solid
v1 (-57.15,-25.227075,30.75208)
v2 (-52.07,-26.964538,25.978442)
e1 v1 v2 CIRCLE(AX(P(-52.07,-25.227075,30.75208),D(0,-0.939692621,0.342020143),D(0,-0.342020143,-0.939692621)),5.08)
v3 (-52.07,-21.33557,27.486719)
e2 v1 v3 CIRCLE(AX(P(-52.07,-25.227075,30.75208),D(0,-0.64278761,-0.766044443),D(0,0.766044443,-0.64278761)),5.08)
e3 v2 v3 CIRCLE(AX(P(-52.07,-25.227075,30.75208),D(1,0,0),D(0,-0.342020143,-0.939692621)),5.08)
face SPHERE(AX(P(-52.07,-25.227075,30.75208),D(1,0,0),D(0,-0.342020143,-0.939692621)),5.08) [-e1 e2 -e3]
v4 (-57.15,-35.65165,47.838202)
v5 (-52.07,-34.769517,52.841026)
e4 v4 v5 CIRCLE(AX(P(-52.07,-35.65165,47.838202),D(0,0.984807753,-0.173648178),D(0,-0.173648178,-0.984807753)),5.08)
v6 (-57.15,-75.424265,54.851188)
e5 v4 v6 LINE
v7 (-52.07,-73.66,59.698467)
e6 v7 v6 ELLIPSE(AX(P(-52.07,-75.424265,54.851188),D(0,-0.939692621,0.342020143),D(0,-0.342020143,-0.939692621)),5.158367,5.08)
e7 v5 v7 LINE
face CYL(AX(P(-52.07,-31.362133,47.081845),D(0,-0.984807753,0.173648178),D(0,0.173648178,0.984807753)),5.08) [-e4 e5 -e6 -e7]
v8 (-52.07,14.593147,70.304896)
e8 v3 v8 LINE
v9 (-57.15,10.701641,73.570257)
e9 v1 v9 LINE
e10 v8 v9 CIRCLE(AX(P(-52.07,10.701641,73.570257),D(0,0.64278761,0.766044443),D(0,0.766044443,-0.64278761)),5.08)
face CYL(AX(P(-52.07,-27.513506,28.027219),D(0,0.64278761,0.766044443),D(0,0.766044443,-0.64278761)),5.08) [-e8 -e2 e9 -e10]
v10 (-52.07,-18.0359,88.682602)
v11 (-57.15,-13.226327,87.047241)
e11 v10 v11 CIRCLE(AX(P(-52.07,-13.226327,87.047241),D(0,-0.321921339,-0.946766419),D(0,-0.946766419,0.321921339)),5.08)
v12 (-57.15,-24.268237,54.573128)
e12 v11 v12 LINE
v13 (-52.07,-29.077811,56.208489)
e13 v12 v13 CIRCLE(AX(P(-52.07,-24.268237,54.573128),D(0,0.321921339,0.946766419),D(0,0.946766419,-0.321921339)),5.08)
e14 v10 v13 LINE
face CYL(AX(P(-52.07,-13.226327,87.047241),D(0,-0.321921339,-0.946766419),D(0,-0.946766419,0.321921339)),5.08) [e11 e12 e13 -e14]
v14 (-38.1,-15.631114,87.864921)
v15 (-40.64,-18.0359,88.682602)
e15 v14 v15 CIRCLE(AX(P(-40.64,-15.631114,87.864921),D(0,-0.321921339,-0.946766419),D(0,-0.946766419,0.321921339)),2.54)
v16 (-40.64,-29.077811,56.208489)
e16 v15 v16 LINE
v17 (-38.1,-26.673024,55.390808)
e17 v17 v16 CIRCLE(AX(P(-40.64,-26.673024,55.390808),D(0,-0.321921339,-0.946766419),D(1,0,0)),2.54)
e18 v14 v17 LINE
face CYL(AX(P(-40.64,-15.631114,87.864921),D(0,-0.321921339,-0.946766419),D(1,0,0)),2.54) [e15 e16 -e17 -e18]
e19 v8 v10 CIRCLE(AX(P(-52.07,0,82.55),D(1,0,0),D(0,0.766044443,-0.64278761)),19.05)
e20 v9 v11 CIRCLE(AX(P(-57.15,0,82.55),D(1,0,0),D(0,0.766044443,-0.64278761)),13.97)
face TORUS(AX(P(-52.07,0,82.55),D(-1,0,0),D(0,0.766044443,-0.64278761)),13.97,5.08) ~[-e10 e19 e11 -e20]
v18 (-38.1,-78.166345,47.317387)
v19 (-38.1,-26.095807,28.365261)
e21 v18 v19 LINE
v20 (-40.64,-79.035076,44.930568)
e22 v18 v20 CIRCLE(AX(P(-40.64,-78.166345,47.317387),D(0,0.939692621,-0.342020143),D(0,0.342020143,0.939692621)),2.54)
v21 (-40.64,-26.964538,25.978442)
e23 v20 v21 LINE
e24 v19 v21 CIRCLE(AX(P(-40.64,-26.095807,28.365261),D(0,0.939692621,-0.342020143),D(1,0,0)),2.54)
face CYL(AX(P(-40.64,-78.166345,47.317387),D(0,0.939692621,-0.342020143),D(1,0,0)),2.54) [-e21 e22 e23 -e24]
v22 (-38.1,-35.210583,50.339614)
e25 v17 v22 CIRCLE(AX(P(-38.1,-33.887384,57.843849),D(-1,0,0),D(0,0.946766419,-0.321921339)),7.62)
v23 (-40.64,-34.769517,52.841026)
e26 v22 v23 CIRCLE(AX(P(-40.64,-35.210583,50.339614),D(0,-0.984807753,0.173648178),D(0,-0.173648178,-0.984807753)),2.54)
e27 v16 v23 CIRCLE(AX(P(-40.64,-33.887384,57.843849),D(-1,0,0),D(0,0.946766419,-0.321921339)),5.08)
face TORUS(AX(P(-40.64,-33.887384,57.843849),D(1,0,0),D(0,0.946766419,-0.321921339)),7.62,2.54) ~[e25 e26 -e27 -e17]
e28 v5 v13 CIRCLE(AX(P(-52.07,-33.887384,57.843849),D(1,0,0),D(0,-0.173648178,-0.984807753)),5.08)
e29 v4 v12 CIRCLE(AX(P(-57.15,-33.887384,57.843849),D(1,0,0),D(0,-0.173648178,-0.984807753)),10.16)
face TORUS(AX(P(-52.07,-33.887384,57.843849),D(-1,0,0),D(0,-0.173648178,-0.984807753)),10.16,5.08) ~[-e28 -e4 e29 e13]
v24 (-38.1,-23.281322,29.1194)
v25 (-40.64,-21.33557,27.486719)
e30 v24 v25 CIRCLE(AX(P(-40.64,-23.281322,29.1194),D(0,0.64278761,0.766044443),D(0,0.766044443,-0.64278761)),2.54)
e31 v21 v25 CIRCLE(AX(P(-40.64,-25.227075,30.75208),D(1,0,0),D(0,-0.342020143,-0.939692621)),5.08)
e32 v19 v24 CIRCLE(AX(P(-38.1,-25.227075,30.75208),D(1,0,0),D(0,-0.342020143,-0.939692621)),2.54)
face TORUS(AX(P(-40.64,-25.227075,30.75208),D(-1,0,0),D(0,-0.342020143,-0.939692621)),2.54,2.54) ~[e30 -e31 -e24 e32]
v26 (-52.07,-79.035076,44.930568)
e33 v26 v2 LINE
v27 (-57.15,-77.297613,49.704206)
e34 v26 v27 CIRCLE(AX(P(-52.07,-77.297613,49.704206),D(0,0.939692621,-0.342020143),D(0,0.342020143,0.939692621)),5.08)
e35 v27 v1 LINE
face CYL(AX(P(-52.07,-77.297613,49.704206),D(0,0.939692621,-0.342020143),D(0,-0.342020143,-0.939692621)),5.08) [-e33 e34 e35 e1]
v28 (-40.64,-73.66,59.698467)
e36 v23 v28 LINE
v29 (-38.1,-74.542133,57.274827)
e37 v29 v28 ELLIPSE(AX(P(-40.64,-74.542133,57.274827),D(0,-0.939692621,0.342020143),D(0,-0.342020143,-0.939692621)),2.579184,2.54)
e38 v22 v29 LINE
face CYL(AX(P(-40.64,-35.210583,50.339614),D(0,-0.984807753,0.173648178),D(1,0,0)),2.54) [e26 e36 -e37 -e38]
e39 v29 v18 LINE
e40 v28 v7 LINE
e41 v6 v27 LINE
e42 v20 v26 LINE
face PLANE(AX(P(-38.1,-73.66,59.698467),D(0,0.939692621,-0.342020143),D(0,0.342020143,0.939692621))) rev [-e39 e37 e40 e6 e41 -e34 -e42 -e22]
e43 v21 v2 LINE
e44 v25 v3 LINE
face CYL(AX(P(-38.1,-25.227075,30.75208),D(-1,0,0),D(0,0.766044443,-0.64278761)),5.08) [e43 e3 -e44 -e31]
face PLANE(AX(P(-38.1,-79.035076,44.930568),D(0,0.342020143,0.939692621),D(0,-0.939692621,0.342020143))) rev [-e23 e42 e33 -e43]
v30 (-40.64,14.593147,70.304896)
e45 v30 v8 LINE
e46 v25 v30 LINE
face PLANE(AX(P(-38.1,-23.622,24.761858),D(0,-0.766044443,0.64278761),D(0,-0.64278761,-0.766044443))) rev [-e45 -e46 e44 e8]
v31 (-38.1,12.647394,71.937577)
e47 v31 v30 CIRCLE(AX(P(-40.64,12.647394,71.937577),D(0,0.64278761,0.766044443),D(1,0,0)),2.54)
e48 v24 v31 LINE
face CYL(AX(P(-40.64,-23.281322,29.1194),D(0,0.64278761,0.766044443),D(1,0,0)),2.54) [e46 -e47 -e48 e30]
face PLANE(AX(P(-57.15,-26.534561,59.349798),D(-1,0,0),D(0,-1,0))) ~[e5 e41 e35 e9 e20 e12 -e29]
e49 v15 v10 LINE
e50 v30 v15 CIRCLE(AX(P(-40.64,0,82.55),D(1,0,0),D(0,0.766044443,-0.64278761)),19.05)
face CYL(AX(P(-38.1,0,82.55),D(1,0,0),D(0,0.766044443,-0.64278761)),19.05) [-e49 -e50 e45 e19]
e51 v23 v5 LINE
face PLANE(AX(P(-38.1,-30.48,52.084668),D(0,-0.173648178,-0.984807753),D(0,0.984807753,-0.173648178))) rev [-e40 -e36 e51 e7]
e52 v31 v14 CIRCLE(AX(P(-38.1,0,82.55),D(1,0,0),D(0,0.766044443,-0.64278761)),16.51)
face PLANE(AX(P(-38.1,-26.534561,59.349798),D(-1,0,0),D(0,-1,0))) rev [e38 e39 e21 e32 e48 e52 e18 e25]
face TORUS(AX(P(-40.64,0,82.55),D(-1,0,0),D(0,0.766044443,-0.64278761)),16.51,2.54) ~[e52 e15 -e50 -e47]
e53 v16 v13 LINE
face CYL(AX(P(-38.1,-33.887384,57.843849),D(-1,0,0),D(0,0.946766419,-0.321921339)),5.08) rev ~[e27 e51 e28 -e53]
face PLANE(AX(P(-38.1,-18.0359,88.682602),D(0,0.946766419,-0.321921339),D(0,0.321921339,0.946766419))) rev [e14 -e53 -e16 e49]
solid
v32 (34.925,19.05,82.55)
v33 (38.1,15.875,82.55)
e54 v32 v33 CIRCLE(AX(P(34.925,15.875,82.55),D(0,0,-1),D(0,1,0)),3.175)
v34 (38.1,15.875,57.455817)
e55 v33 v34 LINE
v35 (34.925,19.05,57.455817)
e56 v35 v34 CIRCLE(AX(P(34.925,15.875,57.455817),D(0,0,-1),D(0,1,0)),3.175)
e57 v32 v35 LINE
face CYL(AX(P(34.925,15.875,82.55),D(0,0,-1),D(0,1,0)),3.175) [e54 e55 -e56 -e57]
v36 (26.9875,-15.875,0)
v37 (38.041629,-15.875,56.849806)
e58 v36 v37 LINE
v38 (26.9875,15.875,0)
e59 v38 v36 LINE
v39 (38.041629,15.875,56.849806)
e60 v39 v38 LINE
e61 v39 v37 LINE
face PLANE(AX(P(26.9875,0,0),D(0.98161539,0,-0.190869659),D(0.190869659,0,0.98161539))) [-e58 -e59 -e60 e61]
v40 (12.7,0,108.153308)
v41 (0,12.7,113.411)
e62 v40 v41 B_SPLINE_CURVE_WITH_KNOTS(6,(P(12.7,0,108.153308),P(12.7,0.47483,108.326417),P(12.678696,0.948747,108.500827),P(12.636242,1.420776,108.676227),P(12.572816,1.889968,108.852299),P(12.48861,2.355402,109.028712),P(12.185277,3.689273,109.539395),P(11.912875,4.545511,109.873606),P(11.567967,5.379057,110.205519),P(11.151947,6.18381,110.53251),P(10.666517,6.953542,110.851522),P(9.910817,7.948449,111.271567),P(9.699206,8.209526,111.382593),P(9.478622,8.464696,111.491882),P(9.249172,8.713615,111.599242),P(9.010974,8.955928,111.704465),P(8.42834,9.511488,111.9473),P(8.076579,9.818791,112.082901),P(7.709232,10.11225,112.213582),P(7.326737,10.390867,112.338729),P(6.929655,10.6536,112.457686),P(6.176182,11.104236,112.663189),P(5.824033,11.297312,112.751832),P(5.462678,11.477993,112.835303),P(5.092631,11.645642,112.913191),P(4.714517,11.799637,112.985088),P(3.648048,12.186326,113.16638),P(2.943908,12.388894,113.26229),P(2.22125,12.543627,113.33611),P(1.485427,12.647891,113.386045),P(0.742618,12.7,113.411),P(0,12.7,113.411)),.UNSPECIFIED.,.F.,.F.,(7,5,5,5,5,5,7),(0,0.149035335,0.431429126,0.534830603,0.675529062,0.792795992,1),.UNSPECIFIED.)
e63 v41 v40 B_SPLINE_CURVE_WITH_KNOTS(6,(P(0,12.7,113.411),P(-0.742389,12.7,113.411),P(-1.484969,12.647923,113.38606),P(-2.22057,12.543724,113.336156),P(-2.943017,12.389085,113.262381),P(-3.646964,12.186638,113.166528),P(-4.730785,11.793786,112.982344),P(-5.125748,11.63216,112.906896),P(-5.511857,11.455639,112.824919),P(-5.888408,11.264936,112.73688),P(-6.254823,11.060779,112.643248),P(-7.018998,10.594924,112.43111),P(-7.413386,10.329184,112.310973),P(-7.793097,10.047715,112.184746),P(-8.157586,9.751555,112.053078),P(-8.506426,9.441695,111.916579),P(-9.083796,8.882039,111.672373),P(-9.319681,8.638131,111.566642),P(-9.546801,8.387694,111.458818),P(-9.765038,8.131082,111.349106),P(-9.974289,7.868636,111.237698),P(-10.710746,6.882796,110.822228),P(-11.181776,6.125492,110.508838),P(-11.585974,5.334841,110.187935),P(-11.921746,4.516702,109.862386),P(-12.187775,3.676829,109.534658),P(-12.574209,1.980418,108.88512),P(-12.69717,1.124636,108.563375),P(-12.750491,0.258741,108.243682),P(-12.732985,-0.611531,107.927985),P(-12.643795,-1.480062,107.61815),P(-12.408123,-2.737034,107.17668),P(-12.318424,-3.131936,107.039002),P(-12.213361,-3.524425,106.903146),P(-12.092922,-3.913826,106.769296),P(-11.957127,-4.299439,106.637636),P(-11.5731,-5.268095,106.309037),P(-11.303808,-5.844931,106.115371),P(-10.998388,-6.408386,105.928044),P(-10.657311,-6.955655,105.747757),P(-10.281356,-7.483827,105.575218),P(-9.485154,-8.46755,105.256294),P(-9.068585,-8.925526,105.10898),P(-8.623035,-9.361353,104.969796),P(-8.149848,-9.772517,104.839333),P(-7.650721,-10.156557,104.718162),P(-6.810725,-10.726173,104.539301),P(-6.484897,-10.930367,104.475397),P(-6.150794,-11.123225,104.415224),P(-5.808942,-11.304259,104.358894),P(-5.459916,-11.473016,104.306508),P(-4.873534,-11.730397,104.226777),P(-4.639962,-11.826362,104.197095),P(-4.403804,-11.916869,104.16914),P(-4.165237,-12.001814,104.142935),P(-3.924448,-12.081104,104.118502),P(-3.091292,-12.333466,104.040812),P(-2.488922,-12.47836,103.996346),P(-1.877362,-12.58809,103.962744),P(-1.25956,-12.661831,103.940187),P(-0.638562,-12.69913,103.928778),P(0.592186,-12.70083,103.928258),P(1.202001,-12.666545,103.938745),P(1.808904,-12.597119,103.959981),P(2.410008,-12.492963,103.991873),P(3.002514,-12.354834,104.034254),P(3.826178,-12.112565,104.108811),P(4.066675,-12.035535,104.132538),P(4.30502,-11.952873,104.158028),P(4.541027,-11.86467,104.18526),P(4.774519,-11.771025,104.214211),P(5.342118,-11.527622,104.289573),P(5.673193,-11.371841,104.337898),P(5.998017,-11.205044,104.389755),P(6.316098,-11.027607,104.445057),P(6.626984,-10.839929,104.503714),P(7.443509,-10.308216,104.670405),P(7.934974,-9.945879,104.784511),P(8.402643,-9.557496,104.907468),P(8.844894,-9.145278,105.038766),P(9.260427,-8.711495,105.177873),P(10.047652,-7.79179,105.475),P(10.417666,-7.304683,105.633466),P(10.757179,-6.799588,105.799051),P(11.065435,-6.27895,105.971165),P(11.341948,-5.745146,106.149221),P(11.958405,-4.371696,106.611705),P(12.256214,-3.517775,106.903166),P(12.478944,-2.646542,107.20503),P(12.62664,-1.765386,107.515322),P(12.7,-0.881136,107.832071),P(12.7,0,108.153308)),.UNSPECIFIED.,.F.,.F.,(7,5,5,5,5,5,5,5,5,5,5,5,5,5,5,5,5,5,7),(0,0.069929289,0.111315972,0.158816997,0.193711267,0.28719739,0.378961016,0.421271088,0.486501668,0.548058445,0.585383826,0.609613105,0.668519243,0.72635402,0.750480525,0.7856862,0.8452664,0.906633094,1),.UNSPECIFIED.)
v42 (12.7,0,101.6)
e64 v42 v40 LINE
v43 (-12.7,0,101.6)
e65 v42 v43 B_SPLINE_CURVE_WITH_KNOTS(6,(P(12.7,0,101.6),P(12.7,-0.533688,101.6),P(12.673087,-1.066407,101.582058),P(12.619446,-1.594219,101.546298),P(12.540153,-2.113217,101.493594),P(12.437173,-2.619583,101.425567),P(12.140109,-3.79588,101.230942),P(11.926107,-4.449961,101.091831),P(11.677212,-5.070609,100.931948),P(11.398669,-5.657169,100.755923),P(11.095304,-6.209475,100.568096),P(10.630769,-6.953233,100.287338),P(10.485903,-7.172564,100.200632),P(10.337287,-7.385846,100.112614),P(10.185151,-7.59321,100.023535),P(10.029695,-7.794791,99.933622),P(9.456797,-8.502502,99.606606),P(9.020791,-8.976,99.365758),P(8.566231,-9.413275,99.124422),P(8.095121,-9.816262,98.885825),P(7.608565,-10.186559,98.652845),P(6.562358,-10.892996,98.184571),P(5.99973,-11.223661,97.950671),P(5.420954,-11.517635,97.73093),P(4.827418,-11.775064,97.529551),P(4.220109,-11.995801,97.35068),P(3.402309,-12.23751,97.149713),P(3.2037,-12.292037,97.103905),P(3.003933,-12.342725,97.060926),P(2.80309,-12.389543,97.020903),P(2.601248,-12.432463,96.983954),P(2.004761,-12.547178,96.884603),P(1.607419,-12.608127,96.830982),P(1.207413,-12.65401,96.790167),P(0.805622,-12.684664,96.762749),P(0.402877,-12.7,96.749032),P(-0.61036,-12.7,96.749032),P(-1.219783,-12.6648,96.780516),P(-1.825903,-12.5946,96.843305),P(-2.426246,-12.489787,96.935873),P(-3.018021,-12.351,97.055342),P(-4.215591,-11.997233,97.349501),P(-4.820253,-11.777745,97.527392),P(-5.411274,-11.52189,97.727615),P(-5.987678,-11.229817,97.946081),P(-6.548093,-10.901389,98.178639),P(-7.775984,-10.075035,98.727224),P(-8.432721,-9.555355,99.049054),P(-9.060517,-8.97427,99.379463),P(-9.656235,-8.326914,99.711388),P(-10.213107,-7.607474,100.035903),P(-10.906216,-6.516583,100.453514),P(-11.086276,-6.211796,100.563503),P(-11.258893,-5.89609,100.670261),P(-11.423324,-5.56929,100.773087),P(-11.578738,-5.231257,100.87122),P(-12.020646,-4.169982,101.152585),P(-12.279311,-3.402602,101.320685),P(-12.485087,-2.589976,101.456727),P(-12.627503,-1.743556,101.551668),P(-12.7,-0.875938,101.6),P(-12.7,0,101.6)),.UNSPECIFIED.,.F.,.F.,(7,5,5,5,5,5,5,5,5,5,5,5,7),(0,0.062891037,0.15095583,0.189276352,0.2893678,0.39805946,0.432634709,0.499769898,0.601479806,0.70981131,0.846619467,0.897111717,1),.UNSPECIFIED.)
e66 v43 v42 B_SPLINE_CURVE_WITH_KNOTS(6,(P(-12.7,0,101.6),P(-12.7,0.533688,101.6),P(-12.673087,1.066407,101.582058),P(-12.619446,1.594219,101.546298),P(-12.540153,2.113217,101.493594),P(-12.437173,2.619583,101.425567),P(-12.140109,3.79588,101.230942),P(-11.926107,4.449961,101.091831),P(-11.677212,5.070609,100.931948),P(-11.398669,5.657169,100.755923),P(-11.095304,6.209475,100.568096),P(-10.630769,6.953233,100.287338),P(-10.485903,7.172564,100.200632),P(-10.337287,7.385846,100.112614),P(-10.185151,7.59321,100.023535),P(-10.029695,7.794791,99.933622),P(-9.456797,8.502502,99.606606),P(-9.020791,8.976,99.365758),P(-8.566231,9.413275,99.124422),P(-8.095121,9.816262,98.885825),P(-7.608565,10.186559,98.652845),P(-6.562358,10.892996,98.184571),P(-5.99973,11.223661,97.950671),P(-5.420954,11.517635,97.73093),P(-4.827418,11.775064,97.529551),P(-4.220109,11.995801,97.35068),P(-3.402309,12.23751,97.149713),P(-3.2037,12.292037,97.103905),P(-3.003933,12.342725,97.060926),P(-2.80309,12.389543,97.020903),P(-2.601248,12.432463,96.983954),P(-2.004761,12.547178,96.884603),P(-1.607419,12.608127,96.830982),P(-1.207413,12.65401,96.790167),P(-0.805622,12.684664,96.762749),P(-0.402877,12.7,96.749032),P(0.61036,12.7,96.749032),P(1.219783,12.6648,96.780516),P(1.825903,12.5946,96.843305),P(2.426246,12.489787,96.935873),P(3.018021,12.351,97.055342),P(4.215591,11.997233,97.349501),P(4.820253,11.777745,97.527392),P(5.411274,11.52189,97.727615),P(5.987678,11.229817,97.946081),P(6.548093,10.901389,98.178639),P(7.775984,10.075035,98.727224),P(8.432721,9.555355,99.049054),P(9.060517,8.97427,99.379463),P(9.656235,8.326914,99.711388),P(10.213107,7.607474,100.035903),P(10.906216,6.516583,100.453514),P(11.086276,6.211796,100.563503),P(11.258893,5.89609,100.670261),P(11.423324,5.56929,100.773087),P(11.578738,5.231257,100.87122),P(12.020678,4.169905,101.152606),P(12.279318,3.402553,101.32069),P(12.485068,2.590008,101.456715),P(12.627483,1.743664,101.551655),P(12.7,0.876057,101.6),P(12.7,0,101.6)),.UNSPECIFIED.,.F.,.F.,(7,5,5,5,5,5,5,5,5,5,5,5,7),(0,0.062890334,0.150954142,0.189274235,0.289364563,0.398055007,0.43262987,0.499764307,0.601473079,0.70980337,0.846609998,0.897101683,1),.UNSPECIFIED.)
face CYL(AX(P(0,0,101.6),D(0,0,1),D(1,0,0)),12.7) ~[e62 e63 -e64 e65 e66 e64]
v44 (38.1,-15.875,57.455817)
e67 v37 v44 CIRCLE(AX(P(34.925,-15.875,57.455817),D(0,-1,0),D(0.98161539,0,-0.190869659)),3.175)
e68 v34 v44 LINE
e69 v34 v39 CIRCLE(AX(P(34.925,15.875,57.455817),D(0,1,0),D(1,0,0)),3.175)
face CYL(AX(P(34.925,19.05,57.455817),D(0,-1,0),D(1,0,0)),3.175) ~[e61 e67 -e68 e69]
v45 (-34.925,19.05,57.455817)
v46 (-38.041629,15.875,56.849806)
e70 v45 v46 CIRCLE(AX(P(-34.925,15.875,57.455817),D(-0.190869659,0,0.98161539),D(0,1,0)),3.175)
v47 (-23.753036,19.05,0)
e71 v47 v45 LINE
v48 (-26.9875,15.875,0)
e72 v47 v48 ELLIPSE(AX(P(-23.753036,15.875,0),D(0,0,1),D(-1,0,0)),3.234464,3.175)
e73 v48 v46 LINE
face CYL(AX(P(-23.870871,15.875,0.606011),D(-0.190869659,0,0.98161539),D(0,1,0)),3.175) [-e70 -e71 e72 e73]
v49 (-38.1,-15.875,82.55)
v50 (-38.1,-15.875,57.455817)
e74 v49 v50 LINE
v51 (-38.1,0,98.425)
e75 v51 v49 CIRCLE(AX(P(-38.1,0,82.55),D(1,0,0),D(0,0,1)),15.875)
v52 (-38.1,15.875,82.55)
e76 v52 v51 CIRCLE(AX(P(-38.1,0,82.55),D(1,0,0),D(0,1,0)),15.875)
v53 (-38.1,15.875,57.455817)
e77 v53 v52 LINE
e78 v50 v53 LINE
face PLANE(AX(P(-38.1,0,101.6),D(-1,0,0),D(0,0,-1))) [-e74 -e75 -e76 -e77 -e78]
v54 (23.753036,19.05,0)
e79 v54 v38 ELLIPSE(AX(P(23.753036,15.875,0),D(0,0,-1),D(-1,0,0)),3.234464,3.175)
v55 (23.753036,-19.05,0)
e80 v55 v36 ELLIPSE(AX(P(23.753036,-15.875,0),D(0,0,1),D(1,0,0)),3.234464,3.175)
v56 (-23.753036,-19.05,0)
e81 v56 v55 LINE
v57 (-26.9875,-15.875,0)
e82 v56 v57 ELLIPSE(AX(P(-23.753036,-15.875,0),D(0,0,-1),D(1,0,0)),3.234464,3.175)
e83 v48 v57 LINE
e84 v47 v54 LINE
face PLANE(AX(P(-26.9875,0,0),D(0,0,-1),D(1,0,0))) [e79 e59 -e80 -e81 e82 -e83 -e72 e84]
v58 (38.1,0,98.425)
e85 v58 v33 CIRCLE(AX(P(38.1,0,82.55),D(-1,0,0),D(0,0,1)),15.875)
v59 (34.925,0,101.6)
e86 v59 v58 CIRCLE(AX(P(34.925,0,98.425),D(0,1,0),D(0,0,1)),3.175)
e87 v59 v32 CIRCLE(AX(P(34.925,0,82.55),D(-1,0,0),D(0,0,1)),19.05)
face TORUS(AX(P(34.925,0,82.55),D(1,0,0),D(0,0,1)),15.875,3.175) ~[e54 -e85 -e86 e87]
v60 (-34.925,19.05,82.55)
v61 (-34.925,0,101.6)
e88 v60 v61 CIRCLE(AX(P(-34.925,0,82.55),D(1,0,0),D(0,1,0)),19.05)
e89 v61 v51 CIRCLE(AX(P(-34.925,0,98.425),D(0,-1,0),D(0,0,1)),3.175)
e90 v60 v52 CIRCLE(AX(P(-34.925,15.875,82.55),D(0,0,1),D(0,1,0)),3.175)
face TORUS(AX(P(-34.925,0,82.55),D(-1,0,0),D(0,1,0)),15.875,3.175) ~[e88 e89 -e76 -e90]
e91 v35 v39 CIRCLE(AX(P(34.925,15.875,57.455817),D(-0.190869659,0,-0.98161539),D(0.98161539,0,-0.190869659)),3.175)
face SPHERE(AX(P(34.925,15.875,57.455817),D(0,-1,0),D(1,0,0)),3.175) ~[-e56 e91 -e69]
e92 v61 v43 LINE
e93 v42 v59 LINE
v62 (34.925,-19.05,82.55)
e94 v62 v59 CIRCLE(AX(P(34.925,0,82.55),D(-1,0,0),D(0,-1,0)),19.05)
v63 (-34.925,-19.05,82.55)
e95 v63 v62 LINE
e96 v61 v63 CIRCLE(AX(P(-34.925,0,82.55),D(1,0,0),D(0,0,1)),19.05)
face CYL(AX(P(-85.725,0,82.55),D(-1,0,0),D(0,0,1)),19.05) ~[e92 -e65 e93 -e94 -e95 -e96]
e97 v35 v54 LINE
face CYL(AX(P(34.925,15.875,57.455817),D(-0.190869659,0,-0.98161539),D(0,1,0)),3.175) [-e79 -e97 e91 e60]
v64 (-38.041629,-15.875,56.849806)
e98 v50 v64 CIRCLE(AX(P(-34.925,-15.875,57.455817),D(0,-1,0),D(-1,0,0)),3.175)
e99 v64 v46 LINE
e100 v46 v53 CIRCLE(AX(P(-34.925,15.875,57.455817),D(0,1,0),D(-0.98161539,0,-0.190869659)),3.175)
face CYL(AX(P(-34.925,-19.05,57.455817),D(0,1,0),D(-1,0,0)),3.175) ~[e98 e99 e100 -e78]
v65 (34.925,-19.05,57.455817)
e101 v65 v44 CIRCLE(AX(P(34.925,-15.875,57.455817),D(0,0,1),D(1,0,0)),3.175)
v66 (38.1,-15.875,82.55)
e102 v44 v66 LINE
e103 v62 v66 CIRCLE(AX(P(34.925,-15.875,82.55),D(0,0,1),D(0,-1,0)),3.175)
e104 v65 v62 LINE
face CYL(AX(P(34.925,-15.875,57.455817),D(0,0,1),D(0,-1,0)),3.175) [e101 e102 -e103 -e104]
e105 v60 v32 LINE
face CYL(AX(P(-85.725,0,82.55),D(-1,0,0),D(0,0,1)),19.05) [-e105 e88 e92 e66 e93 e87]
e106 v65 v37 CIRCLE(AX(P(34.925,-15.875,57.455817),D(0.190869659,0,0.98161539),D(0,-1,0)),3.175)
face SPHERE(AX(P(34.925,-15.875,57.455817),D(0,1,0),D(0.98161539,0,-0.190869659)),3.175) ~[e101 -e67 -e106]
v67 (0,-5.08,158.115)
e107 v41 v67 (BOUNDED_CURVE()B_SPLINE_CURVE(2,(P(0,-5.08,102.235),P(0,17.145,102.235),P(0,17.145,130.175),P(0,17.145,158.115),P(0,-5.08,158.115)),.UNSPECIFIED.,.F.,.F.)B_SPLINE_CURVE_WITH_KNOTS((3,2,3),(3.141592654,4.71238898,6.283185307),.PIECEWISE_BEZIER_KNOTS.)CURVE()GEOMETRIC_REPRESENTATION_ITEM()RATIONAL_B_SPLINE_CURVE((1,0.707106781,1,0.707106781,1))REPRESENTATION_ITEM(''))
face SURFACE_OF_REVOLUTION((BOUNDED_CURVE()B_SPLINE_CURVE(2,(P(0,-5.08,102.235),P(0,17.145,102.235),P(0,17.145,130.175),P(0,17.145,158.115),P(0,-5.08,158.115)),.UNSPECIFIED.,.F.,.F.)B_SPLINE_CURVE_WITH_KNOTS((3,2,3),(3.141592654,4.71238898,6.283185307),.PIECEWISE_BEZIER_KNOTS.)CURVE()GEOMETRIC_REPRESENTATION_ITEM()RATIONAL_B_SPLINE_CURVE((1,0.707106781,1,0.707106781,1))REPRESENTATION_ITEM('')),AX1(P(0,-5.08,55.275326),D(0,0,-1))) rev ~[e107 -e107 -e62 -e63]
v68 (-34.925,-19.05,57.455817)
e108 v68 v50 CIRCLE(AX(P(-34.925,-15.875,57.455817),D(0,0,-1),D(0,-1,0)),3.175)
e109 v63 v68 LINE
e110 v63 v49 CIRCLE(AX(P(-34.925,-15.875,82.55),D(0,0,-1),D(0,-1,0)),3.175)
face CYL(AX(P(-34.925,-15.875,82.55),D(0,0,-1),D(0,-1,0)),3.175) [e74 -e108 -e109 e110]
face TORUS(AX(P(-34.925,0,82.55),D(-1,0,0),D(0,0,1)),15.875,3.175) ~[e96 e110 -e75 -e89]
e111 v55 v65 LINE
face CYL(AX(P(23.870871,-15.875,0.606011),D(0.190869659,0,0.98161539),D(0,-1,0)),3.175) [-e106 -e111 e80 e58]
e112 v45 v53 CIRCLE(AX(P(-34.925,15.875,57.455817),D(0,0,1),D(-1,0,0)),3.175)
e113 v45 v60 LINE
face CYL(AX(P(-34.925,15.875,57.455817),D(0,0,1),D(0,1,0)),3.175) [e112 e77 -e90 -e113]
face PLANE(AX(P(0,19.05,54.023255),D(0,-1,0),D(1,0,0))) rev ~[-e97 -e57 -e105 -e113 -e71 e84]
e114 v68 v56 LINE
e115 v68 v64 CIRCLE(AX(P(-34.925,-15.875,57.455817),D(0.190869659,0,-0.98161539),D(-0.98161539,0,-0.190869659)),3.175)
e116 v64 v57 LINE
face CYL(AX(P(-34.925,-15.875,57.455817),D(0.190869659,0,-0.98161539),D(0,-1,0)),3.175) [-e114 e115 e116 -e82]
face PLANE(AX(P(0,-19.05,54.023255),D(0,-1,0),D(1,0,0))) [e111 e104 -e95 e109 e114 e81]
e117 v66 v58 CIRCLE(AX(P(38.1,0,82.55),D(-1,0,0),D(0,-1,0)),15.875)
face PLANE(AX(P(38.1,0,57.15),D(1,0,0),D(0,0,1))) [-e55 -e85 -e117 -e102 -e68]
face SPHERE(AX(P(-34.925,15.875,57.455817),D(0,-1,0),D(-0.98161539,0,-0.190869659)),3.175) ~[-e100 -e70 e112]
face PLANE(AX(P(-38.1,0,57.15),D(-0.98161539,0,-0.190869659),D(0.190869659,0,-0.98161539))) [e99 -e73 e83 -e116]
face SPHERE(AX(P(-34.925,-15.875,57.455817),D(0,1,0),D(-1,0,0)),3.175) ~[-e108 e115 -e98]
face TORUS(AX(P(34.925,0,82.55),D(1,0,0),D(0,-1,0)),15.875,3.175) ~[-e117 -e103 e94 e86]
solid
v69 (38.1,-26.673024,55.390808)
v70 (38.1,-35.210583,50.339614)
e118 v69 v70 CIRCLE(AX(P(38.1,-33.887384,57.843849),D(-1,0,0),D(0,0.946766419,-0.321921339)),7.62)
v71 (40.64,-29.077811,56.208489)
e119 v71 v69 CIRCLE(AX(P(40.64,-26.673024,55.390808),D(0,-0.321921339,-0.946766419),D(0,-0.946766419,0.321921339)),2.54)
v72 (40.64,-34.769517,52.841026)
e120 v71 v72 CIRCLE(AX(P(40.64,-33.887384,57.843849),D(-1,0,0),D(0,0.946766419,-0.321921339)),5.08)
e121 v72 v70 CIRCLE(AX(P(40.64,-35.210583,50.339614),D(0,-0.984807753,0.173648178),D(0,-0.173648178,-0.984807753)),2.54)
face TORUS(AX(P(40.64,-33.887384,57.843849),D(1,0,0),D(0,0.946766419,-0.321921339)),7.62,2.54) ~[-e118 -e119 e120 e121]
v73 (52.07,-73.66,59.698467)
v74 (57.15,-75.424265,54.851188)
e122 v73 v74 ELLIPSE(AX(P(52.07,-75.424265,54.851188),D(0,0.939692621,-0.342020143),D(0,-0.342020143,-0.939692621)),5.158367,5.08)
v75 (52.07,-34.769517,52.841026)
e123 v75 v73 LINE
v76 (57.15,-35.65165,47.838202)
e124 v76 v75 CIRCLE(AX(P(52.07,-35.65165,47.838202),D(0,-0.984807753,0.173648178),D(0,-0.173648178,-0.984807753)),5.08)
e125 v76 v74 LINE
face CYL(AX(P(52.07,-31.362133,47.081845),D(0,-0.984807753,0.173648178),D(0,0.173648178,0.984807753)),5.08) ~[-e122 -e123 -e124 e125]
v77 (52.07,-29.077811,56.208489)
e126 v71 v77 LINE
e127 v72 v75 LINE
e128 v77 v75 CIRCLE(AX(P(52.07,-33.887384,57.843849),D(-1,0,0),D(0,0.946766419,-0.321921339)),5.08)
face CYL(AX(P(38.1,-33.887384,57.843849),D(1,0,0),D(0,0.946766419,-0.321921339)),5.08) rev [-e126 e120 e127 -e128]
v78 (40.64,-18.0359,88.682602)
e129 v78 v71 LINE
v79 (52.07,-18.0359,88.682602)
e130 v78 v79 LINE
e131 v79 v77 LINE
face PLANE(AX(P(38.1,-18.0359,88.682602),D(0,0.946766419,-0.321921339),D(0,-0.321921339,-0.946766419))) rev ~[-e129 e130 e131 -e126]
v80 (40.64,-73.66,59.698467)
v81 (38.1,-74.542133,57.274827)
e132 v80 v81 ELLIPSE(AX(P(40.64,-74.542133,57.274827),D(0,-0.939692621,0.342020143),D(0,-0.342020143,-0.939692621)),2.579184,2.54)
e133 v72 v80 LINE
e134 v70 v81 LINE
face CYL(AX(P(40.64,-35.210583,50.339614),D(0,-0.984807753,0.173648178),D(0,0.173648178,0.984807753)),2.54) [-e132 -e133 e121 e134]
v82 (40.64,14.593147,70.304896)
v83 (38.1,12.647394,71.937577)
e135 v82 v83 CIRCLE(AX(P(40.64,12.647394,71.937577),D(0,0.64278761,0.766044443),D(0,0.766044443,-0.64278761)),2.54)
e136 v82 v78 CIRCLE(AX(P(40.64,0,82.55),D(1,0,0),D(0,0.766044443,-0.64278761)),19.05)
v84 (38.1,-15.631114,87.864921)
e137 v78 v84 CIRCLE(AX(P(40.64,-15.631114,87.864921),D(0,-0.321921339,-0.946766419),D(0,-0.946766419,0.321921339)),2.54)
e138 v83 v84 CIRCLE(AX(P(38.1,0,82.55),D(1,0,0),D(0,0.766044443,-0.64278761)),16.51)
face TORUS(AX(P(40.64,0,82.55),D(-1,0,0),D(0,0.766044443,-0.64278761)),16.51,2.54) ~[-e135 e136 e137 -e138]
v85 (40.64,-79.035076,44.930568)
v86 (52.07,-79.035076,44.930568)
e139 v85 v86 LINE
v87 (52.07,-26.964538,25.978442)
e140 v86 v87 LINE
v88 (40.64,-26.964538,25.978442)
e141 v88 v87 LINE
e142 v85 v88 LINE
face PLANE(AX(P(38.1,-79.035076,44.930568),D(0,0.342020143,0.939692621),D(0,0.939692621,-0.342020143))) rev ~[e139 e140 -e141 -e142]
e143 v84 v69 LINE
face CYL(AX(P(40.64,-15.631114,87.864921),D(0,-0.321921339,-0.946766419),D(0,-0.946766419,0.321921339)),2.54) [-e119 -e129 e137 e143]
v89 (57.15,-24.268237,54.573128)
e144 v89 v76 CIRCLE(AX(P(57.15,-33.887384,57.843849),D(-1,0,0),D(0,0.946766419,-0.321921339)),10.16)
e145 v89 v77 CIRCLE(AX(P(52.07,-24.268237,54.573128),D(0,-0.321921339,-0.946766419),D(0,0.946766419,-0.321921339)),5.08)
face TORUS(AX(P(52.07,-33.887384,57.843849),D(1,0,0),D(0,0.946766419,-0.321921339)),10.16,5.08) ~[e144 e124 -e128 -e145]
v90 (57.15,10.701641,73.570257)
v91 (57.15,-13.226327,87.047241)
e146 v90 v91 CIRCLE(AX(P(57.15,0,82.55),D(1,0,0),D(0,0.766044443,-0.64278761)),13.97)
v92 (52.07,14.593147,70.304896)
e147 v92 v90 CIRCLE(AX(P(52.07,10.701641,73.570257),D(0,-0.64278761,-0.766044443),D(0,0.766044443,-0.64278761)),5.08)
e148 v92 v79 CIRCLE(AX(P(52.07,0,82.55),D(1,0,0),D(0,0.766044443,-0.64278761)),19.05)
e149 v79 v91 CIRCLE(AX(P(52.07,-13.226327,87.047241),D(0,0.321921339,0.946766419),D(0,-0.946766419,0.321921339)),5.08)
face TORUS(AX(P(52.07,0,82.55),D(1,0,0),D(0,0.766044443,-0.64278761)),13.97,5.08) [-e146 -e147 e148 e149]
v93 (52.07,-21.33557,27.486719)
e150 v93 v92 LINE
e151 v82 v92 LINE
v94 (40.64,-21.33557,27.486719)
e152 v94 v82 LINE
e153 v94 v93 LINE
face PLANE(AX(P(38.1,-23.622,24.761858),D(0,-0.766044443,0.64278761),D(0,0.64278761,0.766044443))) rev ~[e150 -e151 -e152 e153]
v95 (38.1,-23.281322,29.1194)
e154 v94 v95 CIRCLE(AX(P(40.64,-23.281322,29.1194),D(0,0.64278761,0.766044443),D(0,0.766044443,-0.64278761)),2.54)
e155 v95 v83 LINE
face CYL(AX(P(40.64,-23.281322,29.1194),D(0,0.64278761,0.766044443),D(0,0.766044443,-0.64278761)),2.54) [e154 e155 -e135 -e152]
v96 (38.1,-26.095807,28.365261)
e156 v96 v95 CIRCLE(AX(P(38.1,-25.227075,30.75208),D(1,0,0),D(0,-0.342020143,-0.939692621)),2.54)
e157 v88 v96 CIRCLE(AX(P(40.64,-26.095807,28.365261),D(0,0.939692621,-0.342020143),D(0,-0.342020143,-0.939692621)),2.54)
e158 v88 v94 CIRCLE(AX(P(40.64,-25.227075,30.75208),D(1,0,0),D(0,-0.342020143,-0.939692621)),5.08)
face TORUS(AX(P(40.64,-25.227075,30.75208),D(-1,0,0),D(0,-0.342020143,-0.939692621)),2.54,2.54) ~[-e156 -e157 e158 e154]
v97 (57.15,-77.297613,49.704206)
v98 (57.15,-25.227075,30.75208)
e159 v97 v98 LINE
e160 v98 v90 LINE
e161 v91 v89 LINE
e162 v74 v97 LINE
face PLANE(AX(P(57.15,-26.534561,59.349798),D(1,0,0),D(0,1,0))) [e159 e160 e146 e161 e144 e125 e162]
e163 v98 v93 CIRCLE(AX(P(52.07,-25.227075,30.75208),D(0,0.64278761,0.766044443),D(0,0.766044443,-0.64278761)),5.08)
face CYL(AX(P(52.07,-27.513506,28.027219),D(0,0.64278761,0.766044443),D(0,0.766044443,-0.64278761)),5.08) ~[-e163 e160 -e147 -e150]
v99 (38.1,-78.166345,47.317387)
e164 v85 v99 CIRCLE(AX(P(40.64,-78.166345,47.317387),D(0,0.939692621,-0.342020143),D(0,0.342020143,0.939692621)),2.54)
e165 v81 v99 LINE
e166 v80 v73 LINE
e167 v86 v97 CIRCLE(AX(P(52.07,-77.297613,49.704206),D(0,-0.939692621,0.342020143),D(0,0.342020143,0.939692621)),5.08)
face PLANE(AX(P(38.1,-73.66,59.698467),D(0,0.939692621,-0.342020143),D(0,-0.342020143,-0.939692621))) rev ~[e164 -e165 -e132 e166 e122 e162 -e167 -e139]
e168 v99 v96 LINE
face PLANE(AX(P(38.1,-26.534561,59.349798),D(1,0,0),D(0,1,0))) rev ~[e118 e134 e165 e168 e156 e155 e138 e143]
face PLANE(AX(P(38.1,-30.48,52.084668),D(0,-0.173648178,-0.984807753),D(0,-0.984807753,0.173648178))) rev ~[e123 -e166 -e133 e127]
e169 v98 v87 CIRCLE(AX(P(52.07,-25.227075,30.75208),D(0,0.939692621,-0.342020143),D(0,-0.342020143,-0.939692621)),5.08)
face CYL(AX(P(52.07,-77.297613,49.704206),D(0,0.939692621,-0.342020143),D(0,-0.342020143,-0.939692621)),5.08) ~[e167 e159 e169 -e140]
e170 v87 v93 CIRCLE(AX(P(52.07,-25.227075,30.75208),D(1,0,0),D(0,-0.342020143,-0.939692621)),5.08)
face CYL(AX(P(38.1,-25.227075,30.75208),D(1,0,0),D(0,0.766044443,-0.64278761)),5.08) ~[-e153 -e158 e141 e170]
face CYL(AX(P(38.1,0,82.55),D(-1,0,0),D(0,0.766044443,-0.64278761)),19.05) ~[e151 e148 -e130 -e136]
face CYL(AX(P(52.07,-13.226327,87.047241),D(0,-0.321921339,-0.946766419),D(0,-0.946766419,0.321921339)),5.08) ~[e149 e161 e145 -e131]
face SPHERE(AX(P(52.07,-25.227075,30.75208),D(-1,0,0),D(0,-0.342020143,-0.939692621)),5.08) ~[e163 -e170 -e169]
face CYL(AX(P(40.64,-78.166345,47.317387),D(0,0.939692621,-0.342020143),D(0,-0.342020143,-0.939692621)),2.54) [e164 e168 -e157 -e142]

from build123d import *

# Parameters (mm, degrees)
F1_DEPTH    = 19.05
F2_T1_DEPTH = 171.45
F3_W        = 12.7
F3_H        = 38.1
F7_R        = 3.175
F8_R        = 3.175
F10_DEPTH   = 19.05
F11_R       = 5.08
F11_2_R     = 5.08
F14_R       = 2.54
F14_2_R     = 2.54


# Not quite as in the source:
# - a fillet or chamfer that OpenCascade refuses, or shapes differently, is made with other operations: its cross-section is extruded or revolved along the edge and cut away or added
# - two fillets or chamfers of one size are made in one step
# - a pattern or mirror of a feature is missing from the dataset's text; its kind, count and spacing are read off the source's solid


with BuildPart() as f1:
    # F0 (on Front) → F1 (new body, symmetric)
    with BuildSketch(Plane.XZ):
        Polygon((-38.1, 57.15), (-26.9875, 0), (26.9875, 0), (38.1, 57.15), (38.1, 101.6), (-38.1, 101.6), align=None)
    extrude(amount=F1_DEPTH, both=True)

    # F2: fillet of radius 19.05 on 2 edges, made by hand

    # F2_s2 → F2_t1 (cut)
    with BuildSketch(Plane.YZ.offset(-85.725)):
        with BuildLine():
            ThreePointArc((0, 101.6), (-13.4703841816, 96.0203841816), (-19.05, 82.55))
            Line((-19.05, 82.55), (-19.05, 101.6))
            Line((-19.05, 101.6), (0, 101.6))
        make_face()
        with BuildLine():
            ThreePointArc((0, 101.6), (13.4703841816, 96.0203841816), (19.05, 82.55))
            Line((19.05, 82.55), (19.05, 101.6))
            Line((19.05, 101.6), (0, 101.6))
        make_face()
    extrude(amount=F2_T1_DEPTH, mode=Mode.SUBTRACT)

    # F3 (on Front) → F4 (revolve)
    with BuildSketch(Plane.XZ):
        with Locations((6.35, 101.6)):
            Rectangle(F3_W, F3_H)
    revolve(axis=Axis((0, 0, 41.275), (0, 0, -1)))

    # F5 (on Right) → F6 (revolve)
    with BuildSketch(Plane.YZ):
        with BuildLine():
            Line((-5.08, 158.115), (-5.08, 102.235))
            add(Edge.make_bspline(
                [(-5.08, 102.235), (17.145, 102.235), (17.145, 130.175), (17.145, 158.115), (-5.08, 158.115)],
                knots=[3.1415926536, 3.1415926536, 3.1415926536, 4.7123889804, 4.7123889804, 6.2831853072, 6.2831853072, 6.2831853072], degree=2, weights=[1, 0.7071067812, 1, 0.7071067812, 1]))
        make_face()
    revolve(axis=Axis((0, -5.08, 55.275326029), (0, 0, -1)))

    # F7
    f7_edges = [f1.edges().sort_by_distance(p)[0] for p in [
        (-38.1, 0, 57.15),
        (38.1, 0, 57.15),
    ]]
    fillet(f7_edges, radius=F7_R)

    # F8
    f8_edges = [f1.edges().sort_by_distance(p)[0] for p in [
        (32.514564, -19.05, 28.424903),
        (-32.514564, -19.05, 28.424903),
        (-32.514564, 19.05, 28.424903),
        (-38.1, 19.05, 70.002908),
        (-38.085374, 19.05, 57.151409),
        (38.1, 19.05, 70.002908),
        (38.085374, 19.05, 57.151409),
        (32.514564, 19.05, 28.424903),
        (-38.085374, -19.05, 57.151409),
        (38.085374, -19.05, 57.151409),
        (-38.1, -13.470384, 96.020384),
        (-38.1, 13.470384, 96.020384),
        (38.1, 13.470384, 96.020384),
        (38.1, -13.470384, 96.020384),
    ]]
    fillet(f8_edges, radius=F8_R)


with BuildPart() as f10:
    # F9 (on face) → F10 (new body)
    with BuildSketch(Plane.YZ.offset(38.1)):
        with BuildLine():
            Line((-23.622, 24.761857734), (14.5931466414, 70.3048960355))
            ThreePointArc((14.5931466414, 70.3048960355), (9.3486979196, 99.1483236264), (-18.0359002739, 88.6826015123))
            Line((-18.0359002739, 88.6826015123), (-30.48, 52.084668122))
            Line((-30.48, 52.084668122), (-73.66, 59.698467149))
            Line((-73.66, 59.698467149), (-79.0350757506, 44.9305678964))
            Line((-79.0350757506, 44.9305678964), (-23.622, 24.761857734))
        make_face()
    extrude(amount=F10_DEPTH)


with BuildPart() as f10_copies_1:
    # F10_copies: instance of F10
    add(f10.part.mirror(Plane(origin=(0, 0, 0), x_dir=(0, 0, -1), z_dir=(-1, 0, 0))))

    # F11#2
    f11_2_edges = [f10_copies_1.edges().sort_by_distance(p)[0] for p in [
        (-47.625, -23.622, 24.761858),
        (-57.15, -51.328538, 34.846213),
        (-57.15, -4.514427, 47.533377),
        (-57.15, 9.348698, 99.148324),
        (-47.625, -30.48, 52.084668),
        (-57.15, -24.25795, 70.383635),
        (-57.15, -52.07, 55.891568),
    ]]
    fillet(f11_2_edges, radius=F11_2_R)

    # F14#2
    f14_2_edges = [f10_copies_1.edges().sort_by_distance(p)[0] for p in [
        (-38.1, -52.999807, 35.454505),
        (-38.1, -23.912275, 25.845177),
        (-38.1, -54.214758, 56.269746),
        (-38.1, 9.348698, 99.148324),
        (-38.1, -31.300658, 53.47175),
        (-38.1, -23.556855, 72.445545),
    ]]
    fillet(f14_2_edges, radius=F14_2_R)


with BuildPart() as f10_1:
    add(f10.part)

    # F11
    f11_edges = [f10_1.edges().sort_by_distance(p)[0] for p in [
        (47.625, -30.48, 52.084668),
        (47.625, -23.622, 24.761858),
        (57.15, -51.328538, 34.846213),
        (57.15, -4.514427, 47.533377),
        (57.15, 9.348698, 99.148324),
        (57.15, -24.25795, 70.383635),
        (57.15, -52.07, 55.891568),
    ]]
    fillet(f11_edges, radius=F11_R)

    # F14
    f14_edges = [f10_1.edges().sort_by_distance(p)[0] for p in [
        (38.1, -3.371211, 48.895808),
        (38.1, -52.999807, 35.454505),
        (38.1, -23.912275, 25.845177),
        (38.1, -54.214758, 56.269746),
        (38.1, 9.348698, 99.148324),
        (38.1, -31.300658, 53.47175),
        (38.1, -23.556855, 72.445545),
    ]]
    fillet(f14_edges, radius=F14_R)


solid = Compound([f1.part, f10_copies_1.part, f10_1.part])
